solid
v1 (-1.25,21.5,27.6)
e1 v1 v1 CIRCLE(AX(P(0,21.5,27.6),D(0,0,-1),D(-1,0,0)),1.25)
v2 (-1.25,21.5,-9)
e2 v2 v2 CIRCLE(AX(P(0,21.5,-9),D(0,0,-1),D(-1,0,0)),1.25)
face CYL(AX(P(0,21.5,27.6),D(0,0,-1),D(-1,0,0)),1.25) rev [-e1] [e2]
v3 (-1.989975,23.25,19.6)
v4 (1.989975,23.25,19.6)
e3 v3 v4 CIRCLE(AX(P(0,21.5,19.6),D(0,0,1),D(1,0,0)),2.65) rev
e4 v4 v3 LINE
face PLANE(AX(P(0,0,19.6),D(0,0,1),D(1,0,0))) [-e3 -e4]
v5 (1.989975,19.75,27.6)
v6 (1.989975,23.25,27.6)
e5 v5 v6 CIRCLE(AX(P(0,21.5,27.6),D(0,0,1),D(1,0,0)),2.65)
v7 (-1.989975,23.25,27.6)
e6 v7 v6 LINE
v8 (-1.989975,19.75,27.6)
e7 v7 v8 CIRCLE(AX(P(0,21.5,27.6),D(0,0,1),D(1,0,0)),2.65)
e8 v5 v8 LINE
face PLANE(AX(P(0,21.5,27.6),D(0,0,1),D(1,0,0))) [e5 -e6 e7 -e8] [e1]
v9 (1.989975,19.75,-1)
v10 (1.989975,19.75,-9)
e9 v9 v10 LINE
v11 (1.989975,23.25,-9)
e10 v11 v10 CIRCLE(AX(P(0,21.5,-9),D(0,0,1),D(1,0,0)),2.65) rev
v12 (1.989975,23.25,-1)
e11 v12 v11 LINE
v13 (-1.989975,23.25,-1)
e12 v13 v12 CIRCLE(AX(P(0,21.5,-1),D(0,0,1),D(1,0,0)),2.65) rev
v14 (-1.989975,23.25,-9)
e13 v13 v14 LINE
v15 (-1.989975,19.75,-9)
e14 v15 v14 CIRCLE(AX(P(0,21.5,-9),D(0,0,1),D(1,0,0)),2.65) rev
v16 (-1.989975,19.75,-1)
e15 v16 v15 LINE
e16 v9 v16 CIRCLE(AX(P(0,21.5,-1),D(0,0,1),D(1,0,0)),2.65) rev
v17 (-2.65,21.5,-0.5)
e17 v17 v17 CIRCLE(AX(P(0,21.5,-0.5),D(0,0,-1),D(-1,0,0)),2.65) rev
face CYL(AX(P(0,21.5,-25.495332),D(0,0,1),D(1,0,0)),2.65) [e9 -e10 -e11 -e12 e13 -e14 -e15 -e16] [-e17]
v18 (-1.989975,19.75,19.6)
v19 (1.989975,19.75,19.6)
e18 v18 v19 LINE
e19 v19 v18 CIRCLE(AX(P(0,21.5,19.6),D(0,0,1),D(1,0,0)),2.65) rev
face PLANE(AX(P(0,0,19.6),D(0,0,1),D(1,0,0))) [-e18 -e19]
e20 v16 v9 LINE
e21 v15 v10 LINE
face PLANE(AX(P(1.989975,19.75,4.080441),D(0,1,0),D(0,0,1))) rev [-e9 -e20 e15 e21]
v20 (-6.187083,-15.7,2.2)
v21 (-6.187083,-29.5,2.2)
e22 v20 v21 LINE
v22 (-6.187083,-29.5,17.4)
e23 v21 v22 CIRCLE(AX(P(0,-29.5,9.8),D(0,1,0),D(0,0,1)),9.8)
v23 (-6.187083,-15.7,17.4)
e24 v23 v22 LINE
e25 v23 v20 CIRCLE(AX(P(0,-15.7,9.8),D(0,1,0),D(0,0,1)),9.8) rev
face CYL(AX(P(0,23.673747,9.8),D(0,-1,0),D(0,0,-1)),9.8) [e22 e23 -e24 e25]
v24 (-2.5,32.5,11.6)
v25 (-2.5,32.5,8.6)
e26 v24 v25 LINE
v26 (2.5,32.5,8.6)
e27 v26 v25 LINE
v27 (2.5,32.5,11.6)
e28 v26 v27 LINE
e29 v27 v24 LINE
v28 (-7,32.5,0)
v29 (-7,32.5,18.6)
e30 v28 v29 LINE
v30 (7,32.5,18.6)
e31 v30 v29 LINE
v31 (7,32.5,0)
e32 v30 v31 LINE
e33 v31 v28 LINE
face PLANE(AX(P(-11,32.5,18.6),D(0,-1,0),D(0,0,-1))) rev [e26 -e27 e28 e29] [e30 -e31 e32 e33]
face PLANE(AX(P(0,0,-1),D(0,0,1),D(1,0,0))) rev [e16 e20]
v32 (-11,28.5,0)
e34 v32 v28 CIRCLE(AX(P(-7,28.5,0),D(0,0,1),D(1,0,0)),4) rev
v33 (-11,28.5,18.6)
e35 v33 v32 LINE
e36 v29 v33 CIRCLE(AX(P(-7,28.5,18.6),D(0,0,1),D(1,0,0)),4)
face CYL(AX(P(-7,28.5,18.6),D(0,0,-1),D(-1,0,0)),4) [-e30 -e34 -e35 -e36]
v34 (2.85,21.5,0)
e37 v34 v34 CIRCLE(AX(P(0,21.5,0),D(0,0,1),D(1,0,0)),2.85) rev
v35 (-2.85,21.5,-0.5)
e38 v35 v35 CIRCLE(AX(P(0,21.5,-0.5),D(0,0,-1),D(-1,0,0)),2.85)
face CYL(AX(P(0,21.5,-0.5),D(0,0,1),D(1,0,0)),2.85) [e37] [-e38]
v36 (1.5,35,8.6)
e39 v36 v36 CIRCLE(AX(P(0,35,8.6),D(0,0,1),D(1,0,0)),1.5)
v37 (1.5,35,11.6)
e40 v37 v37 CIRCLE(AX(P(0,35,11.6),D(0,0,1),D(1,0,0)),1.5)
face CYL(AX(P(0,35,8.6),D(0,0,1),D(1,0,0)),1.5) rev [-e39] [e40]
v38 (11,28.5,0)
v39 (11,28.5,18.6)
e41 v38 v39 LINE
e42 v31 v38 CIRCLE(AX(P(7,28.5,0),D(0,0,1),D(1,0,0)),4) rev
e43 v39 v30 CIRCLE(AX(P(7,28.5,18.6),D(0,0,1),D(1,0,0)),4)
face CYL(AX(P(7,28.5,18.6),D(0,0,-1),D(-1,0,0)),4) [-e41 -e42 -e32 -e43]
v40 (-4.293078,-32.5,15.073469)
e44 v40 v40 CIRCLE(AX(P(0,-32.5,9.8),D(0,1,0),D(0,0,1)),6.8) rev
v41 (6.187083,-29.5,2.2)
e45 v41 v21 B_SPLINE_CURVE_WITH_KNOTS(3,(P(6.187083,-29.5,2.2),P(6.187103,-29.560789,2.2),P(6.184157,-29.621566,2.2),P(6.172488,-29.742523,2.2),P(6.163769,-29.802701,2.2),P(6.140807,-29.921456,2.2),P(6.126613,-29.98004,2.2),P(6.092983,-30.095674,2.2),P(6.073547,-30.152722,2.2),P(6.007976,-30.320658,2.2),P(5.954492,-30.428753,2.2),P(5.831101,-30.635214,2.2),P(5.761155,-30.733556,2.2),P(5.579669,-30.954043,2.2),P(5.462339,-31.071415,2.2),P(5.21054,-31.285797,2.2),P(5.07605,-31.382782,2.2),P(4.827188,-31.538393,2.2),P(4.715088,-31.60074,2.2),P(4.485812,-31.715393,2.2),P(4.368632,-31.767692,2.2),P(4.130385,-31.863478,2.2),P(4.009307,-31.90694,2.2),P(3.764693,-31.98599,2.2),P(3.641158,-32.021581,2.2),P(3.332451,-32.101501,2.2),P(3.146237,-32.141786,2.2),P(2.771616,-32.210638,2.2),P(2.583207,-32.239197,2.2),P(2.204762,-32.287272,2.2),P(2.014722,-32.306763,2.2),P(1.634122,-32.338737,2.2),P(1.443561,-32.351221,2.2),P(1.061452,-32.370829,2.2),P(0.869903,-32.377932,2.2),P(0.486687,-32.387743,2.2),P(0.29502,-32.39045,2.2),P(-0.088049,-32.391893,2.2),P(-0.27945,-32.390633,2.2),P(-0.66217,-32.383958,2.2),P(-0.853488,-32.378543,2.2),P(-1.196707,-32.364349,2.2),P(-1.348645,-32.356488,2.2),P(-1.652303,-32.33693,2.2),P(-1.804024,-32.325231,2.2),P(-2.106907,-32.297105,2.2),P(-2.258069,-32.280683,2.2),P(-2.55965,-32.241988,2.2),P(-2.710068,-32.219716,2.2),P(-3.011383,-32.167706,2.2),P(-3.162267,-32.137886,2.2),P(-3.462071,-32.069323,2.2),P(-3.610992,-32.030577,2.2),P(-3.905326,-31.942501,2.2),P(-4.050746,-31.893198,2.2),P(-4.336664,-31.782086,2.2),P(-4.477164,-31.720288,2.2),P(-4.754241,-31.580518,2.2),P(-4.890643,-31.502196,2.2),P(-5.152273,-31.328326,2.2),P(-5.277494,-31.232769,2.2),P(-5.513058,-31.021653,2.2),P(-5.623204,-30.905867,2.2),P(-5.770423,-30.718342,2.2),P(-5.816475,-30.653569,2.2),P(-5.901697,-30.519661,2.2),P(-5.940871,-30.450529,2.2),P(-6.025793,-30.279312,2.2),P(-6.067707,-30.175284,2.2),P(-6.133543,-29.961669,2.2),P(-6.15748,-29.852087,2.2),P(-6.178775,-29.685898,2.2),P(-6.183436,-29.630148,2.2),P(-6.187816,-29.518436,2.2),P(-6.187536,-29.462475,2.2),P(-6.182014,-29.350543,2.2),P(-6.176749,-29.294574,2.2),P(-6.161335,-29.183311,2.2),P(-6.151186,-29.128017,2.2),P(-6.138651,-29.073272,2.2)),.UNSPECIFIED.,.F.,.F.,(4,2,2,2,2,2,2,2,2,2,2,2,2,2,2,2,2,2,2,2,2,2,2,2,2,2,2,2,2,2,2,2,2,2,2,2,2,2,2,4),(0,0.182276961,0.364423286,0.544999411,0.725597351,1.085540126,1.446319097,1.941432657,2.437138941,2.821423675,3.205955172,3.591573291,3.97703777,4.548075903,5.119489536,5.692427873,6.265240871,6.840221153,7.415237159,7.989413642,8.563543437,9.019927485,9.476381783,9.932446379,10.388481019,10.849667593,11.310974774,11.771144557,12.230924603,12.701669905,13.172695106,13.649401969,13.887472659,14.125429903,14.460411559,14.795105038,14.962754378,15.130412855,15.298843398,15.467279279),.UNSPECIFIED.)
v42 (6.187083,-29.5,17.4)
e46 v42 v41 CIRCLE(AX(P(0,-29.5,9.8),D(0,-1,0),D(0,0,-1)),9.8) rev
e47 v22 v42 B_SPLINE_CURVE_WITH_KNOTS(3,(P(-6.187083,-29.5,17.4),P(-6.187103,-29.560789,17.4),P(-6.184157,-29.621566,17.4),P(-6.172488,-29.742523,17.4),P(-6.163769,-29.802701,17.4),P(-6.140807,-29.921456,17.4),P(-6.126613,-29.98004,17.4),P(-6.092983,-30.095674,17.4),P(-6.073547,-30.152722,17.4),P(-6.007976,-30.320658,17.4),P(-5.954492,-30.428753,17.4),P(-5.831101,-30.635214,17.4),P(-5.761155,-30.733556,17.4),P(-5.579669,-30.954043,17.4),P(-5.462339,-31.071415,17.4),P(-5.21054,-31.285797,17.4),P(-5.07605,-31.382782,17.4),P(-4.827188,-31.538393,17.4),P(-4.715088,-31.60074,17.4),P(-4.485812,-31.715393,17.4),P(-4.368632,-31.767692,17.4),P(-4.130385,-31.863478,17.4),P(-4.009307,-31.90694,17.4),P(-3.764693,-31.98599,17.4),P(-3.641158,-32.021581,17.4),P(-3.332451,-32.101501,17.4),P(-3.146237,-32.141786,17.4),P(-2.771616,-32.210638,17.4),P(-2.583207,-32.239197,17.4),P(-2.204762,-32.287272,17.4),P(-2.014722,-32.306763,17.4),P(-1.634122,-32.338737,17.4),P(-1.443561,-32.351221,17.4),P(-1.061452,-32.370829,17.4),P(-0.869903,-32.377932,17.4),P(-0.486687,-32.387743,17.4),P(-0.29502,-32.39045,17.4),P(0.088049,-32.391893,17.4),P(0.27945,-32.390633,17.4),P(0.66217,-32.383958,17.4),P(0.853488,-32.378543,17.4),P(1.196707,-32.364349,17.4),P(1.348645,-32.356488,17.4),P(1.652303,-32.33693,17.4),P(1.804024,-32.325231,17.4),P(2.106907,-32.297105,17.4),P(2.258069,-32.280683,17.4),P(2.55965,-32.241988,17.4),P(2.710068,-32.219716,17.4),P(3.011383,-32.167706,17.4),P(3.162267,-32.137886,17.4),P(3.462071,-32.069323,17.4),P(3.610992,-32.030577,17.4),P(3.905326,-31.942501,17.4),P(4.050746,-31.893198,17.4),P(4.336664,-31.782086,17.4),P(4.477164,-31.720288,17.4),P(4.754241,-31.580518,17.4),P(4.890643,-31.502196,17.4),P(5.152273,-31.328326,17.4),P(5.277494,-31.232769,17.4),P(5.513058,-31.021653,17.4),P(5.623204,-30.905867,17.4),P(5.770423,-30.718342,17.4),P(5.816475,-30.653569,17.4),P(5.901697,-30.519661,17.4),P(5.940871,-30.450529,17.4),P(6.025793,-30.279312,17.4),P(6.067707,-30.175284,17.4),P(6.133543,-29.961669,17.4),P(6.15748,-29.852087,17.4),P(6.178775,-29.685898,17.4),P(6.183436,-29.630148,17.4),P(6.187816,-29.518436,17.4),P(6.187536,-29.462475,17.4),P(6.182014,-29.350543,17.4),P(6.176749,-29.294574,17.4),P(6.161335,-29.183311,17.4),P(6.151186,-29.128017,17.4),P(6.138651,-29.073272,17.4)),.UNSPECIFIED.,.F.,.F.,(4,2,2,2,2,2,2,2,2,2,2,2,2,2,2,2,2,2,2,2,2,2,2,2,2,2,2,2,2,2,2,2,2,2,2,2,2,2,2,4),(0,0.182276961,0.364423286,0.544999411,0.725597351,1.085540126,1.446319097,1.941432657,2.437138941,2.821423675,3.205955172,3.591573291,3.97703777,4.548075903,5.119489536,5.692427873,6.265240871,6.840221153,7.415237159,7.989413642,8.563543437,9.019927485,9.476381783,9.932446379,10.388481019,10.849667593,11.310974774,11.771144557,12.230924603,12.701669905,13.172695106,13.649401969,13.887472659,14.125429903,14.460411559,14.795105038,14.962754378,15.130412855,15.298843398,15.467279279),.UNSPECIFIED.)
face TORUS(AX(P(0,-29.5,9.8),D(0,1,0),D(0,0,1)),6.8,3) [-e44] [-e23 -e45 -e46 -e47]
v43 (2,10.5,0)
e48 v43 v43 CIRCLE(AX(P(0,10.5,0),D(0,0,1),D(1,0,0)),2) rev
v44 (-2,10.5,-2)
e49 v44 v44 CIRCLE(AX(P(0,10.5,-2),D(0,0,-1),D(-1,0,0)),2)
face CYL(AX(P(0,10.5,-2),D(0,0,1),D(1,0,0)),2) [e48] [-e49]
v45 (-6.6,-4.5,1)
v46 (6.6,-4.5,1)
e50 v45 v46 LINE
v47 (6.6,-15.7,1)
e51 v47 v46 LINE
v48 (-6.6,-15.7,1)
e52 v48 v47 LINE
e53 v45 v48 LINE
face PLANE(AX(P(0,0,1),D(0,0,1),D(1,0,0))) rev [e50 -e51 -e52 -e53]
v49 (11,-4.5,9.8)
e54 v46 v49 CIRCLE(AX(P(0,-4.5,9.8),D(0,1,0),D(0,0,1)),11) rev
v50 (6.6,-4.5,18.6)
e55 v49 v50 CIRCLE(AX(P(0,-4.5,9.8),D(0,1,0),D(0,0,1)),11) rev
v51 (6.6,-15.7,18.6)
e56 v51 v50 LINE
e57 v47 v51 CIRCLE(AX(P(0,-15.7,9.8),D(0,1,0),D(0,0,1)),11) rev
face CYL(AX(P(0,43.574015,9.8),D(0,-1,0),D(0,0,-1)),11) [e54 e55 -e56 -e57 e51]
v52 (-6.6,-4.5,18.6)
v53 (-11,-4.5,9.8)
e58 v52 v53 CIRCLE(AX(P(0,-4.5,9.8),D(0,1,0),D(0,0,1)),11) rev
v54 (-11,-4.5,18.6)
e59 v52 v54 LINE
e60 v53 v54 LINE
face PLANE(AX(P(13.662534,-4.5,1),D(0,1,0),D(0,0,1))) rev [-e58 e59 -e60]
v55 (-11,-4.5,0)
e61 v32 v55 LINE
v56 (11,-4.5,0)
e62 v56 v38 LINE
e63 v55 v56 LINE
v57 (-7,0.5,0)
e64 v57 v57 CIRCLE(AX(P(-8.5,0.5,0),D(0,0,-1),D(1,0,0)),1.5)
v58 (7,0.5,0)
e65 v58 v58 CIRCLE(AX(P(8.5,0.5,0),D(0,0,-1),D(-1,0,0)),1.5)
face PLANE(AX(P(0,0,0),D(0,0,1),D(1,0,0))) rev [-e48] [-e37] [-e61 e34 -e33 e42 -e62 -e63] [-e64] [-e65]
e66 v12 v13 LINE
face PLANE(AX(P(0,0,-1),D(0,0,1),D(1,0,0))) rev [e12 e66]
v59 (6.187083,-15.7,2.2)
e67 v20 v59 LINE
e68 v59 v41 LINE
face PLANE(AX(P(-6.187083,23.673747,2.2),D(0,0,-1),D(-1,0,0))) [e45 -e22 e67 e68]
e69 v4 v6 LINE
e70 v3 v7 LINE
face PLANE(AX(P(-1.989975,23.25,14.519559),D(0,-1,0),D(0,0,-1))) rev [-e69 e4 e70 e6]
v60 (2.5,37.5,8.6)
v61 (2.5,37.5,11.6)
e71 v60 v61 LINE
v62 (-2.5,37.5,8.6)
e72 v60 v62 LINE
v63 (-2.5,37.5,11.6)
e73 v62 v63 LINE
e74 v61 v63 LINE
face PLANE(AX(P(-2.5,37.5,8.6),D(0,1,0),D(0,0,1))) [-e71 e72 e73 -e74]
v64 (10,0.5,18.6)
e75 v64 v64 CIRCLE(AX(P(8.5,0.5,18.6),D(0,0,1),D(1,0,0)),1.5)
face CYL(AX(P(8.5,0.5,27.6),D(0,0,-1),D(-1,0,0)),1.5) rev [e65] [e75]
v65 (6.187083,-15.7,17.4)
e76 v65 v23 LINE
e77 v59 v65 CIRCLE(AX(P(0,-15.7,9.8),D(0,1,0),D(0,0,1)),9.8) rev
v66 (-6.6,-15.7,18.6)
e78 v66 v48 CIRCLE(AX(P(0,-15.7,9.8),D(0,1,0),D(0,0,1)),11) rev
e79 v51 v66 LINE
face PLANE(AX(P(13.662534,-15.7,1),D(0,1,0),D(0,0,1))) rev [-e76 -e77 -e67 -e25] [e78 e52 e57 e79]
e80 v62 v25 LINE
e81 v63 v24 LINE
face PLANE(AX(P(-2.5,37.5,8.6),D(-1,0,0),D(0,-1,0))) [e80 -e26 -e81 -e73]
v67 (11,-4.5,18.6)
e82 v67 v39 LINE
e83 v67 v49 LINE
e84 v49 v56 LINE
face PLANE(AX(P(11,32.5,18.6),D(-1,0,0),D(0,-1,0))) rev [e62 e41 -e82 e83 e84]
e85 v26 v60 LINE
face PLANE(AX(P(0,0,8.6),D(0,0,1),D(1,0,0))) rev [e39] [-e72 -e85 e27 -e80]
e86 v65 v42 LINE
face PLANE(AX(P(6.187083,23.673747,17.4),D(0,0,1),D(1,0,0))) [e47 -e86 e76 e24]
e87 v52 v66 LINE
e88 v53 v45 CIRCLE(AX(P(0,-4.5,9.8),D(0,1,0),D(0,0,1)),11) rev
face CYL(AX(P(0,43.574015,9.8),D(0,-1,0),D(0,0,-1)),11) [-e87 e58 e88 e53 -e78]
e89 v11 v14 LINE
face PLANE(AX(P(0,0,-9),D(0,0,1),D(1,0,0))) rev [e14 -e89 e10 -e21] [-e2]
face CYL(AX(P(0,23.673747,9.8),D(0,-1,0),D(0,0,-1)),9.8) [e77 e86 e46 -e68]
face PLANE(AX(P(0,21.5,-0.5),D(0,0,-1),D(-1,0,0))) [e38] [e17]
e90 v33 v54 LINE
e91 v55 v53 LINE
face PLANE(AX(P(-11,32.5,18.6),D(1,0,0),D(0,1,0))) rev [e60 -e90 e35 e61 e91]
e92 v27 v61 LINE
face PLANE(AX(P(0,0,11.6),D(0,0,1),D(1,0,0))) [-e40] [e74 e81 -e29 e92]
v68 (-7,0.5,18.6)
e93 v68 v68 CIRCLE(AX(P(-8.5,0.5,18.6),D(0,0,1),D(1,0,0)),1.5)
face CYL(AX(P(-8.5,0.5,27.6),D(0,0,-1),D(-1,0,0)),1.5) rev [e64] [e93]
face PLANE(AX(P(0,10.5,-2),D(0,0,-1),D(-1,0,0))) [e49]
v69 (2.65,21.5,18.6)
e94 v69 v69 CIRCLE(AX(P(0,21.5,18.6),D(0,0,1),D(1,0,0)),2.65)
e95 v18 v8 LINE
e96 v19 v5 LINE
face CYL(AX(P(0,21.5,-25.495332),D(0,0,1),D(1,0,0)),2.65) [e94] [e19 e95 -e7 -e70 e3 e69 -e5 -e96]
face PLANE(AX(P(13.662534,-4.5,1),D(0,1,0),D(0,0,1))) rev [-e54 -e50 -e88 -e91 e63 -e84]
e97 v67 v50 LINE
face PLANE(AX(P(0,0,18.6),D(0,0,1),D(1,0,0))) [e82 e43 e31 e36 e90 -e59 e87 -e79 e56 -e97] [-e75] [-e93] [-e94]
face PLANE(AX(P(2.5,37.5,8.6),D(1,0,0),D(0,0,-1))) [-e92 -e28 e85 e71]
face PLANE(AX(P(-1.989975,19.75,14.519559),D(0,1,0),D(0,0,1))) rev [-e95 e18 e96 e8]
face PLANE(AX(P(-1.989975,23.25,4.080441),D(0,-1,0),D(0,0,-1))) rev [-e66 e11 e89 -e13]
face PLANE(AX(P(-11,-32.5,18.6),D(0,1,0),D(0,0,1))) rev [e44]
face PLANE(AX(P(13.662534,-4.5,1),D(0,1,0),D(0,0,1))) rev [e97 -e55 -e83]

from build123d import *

# Parameters (mm, degrees)
SKETCH1_W                = 22
SKETCH1_H                = 65
BOSS_EXTRUDE1_DEPTH      = 18.6
FILLET1_R                = 4
BOSS_EXTRUDE2_DEPTH      = 9
BOSS_EXTRUDE2_DEPTH_BACK = 27.6
SKETCH2_R                = 2.65
CUT_EXTRUDE1_DEPTH       = 8
CUT_EXTRUDE2_DEPTH       = 8
SKETCH5_R                = 1.25
CUT_EXTRUDE3_DEPTH       = 51.16781837
BOSS_EXTRUDE3_START      = -7
SKETCH6_W                = 5
SKETCH6_H                = 10
SKETCH6_R                = 1.5
BOSS_EXTRUDE3_DEPTH      = 3
SKETCH7_R                = 2.85
SKETCH7_R_2              = 2.65
BOSS_EXTRUDE4_DEPTH      = 0.5
SKETCH8_R                = 2
BOSS_EXTRUDE5_DEPTH      = 2
SKETCH9_R                = 1.5
CUT_EXTRUDE4_DEPTH       = 48.843599363
SKETCH10_W               = 27.728887241
SKETCH10_H               = 31.632468454
CUT_EXTRUDE5_DEPTH       = 1
SKETCH11_R               = 16.996731029
SKETCH11_R_2             = 11
CUT_EXTRUDE6_DEPTH       = 28
CUT_EXTRUDE7_DEPTH       = 16.8
FILLET2_R                = 3


with BuildPart() as part:
    # Sketch1 → Boss-Extrude1 (new body)
    with BuildSketch(Plane.XY):
        Rectangle(SKETCH1_W, SKETCH1_H)
    extrude(amount=BOSS_EXTRUDE1_DEPTH)

    # Fillet1
    fillet1_edges = [part.edges().sort_by_distance(p)[0] for p in [
        (-11, 32.5, 9.3),
        (11, 32.5, 9.3),
    ]]
    fillet(fillet1_edges, radius=FILLET1_R)

    # Sketch2 → Boss-Extrude2 (add, two sides: drawn at the far end of the back side and taken through both)
    with BuildSketch(Plane.XY.offset(18.6).offset(-BOSS_EXTRUDE2_DEPTH_BACK)):
        with Locations((0, 21.5)):
            Circle(SKETCH2_R)
    extrude(amount=BOSS_EXTRUDE2_DEPTH + BOSS_EXTRUDE2_DEPTH_BACK)

    # Sketch3 → Cut-Extrude1 (cut)
    with BuildSketch(Plane.XY.offset(27.6)):
        with BuildLine():
            Line((-1.989974874, 23.25), (1.989974874, 23.25))
            ThreePointArc((1.989974874, 23.25), (0, 24.15), (-1.989974874, 23.25))
        make_face()
        with BuildLine():
            Line((-1.989974874, 19.75), (1.989974874, 19.75))
            ThreePointArc((1.989974874, 19.75), (0, 18.85), (-1.989974874, 19.75))
        make_face()
    extrude(amount=-CUT_EXTRUDE1_DEPTH, mode=Mode.SUBTRACT)

    # Sketch4 → Cut-Extrude2 (cut)
    with BuildSketch(Plane(origin=(0, 0, -9), x_dir=(-1, 0, 0), z_dir=(0, 0, -1))):
        with BuildLine():
            Line((-1.989974874, 19.75), (1.989974874, 19.75))
            ThreePointArc((1.989974874, 19.75), (0, 18.85), (-1.989974874, 19.75))
        make_face()
        with BuildLine():
            Line((1.989974874, 23.25), (-1.989974874, 23.25))
            ThreePointArc((-1.989974874, 23.25), (0, 24.15), (1.989974874, 23.25))
        make_face()
    extrude(amount=-CUT_EXTRUDE2_DEPTH, mode=Mode.SUBTRACT)

    # Sketch5 → Cut-Extrude3 (cut, through all)
    with BuildSketch(Plane(origin=(0, 0, -9), x_dir=(-1, 0, 0), z_dir=(0, 0, -1))):
        with Locations((0, 21.5)):
            Circle(SKETCH5_R)
    extrude(amount=-CUT_EXTRUDE3_DEPTH, mode=Mode.SUBTRACT)

    # Sketch6 → Boss-Extrude3 (add)
    with BuildSketch(Plane.XY.offset(18.6).offset(BOSS_EXTRUDE3_START)):
        with Locations((0, 32.5)):
            Rectangle(SKETCH6_W, SKETCH6_H)
        with Locations((0, 35)):
            Circle(SKETCH6_R, mode=Mode.SUBTRACT)
    extrude(amount=-BOSS_EXTRUDE3_DEPTH)

    # Sketch7 → Boss-Extrude4 (add)
    with BuildSketch(Plane(origin=(0, 0, 0), x_dir=(-1, 0, 0), z_dir=(0, 0, -1))):
        with Locations(Location((0, 21.5, 0), (0, 0, 180))):
            Circle(SKETCH7_R)
        with Locations(Location((0, 21.5, 0), (0, 0, 221.328658646))):
            Circle(SKETCH7_R_2, mode=Mode.SUBTRACT)
    extrude(amount=BOSS_EXTRUDE4_DEPTH)

    # Sketch8 → Boss-Extrude5 (add)
    with BuildSketch(Plane(origin=(0, 0, 0), x_dir=(-1, 0, 0), z_dir=(0, 0, -1))):
        with Locations(Location((0, 10.5, 0), (0, 0, 180))):
            Circle(SKETCH8_R)
    extrude(amount=BOSS_EXTRUDE5_DEPTH)

    # Sketch9 → Cut-Extrude4 (cut, through all)
    with BuildSketch(Plane(origin=(0, 0, 0), x_dir=(-1, 0, 0), z_dir=(0, 0, -1))):
        with Locations((-8.5, 0.5)):
            Circle(SKETCH9_R)
        with Locations(Location((8.5, 0.5, 0), (0, 0, 180))):
            Circle(SKETCH9_R)
    extrude(amount=-CUT_EXTRUDE4_DEPTH, mode=Mode.SUBTRACT)

    # Sketch10 → Cut-Extrude5 (cut)
    with BuildSketch(Plane(origin=(0, 0, 0), x_dir=(-1, 0, 0), z_dir=(0, 0, -1))):
        with Locations((0.201909374, -20.316234227)):
            Rectangle(SKETCH10_W, SKETCH10_H)
    extrude(amount=-CUT_EXTRUDE5_DEPTH, mode=Mode.SUBTRACT)

    # Sketch11 → Cut-Extrude6 (cut)
    with BuildSketch(Plane.XZ.offset(32.5)):
        with Locations((0, 9.8)):
            Circle(SKETCH11_R)
        with Locations((0, 9.8)):
            Circle(SKETCH11_R_2, mode=Mode.SUBTRACT)
    extrude(amount=-CUT_EXTRUDE6_DEPTH, mode=Mode.SUBTRACT)

    # Sketch12 → Cut-Extrude7 (cut)
    with BuildSketch(Plane.XZ.offset(32.5)):
        with BuildLine():
            Line((6.6, 18.6), (-6.6, 18.6))
            ThreePointArc((-6.6, 18.6), (-11, 9.8), (-6.6, 1))
            Line((-6.6, 1), (6.6, 1))
            ThreePointArc((6.6, 1), (11, 9.8), (6.6, 18.6))
        make_face()
        with BuildLine():
            Line((6.187083319, 17.4), (-6.187083319, 17.4))
            ThreePointArc((-6.187083319, 17.4), (-9.8, 9.8), (-6.187083319, 2.2))
            Line((-6.187083319, 2.2), (6.187083319, 2.2))
            ThreePointArc((6.187083319, 2.2), (9.8, 9.8), (6.187083319, 17.4))
        make_face(mode=Mode.SUBTRACT)
    extrude(amount=-CUT_EXTRUDE7_DEPTH, mode=Mode.SUBTRACT)

    # Fillet2
    # the kernel refuses this fillet: 3 mm, written as the material it takes off along each edge
    with BuildSketch(Plane(origin=(0, -32.5, 9.8), x_dir=(-0.08233193306434959, 0, -0.9966049632617165), z_dir=(-0.9966049632617165, 0, 0.08233193306434959))) as fillet2_piece_1:
        with BuildLine():
            CenterArc((9.8 - FILLET2_R, -FILLET2_R), FILLET2_R, 0, 90)
            Line((9.8 - FILLET2_R, 0), (9.8, 0))
            Line((9.8, 0), (9.8, -FILLET2_R))
        make_face()
    revolve(axis=Axis((0, -32.5, 9.8), (0, -1, 0)), revolution_arc=189.445235963, mode=Mode.SUBTRACT)
    with BuildSketch(Plane(origin=(0, -32.5, 9.8), x_dir=(0.08233193306435141, 0, 0.9966049632617163), z_dir=(0.9966049632617163, 0, -0.08233193306435141))) as fillet2_piece_2:
        with BuildLine():
            CenterArc((9.8 - FILLET2_R, -FILLET2_R), FILLET2_R, 0, 90)
            Line((9.8 - FILLET2_R, 0), (9.8, 0))
            Line((9.8, 0), (9.8, -FILLET2_R))
        make_face()
    revolve(axis=Axis((0, -32.5, 9.8), (0, -1, 0)), revolution_arc=189.445235963, mode=Mode.SUBTRACT)


solid = part.part
